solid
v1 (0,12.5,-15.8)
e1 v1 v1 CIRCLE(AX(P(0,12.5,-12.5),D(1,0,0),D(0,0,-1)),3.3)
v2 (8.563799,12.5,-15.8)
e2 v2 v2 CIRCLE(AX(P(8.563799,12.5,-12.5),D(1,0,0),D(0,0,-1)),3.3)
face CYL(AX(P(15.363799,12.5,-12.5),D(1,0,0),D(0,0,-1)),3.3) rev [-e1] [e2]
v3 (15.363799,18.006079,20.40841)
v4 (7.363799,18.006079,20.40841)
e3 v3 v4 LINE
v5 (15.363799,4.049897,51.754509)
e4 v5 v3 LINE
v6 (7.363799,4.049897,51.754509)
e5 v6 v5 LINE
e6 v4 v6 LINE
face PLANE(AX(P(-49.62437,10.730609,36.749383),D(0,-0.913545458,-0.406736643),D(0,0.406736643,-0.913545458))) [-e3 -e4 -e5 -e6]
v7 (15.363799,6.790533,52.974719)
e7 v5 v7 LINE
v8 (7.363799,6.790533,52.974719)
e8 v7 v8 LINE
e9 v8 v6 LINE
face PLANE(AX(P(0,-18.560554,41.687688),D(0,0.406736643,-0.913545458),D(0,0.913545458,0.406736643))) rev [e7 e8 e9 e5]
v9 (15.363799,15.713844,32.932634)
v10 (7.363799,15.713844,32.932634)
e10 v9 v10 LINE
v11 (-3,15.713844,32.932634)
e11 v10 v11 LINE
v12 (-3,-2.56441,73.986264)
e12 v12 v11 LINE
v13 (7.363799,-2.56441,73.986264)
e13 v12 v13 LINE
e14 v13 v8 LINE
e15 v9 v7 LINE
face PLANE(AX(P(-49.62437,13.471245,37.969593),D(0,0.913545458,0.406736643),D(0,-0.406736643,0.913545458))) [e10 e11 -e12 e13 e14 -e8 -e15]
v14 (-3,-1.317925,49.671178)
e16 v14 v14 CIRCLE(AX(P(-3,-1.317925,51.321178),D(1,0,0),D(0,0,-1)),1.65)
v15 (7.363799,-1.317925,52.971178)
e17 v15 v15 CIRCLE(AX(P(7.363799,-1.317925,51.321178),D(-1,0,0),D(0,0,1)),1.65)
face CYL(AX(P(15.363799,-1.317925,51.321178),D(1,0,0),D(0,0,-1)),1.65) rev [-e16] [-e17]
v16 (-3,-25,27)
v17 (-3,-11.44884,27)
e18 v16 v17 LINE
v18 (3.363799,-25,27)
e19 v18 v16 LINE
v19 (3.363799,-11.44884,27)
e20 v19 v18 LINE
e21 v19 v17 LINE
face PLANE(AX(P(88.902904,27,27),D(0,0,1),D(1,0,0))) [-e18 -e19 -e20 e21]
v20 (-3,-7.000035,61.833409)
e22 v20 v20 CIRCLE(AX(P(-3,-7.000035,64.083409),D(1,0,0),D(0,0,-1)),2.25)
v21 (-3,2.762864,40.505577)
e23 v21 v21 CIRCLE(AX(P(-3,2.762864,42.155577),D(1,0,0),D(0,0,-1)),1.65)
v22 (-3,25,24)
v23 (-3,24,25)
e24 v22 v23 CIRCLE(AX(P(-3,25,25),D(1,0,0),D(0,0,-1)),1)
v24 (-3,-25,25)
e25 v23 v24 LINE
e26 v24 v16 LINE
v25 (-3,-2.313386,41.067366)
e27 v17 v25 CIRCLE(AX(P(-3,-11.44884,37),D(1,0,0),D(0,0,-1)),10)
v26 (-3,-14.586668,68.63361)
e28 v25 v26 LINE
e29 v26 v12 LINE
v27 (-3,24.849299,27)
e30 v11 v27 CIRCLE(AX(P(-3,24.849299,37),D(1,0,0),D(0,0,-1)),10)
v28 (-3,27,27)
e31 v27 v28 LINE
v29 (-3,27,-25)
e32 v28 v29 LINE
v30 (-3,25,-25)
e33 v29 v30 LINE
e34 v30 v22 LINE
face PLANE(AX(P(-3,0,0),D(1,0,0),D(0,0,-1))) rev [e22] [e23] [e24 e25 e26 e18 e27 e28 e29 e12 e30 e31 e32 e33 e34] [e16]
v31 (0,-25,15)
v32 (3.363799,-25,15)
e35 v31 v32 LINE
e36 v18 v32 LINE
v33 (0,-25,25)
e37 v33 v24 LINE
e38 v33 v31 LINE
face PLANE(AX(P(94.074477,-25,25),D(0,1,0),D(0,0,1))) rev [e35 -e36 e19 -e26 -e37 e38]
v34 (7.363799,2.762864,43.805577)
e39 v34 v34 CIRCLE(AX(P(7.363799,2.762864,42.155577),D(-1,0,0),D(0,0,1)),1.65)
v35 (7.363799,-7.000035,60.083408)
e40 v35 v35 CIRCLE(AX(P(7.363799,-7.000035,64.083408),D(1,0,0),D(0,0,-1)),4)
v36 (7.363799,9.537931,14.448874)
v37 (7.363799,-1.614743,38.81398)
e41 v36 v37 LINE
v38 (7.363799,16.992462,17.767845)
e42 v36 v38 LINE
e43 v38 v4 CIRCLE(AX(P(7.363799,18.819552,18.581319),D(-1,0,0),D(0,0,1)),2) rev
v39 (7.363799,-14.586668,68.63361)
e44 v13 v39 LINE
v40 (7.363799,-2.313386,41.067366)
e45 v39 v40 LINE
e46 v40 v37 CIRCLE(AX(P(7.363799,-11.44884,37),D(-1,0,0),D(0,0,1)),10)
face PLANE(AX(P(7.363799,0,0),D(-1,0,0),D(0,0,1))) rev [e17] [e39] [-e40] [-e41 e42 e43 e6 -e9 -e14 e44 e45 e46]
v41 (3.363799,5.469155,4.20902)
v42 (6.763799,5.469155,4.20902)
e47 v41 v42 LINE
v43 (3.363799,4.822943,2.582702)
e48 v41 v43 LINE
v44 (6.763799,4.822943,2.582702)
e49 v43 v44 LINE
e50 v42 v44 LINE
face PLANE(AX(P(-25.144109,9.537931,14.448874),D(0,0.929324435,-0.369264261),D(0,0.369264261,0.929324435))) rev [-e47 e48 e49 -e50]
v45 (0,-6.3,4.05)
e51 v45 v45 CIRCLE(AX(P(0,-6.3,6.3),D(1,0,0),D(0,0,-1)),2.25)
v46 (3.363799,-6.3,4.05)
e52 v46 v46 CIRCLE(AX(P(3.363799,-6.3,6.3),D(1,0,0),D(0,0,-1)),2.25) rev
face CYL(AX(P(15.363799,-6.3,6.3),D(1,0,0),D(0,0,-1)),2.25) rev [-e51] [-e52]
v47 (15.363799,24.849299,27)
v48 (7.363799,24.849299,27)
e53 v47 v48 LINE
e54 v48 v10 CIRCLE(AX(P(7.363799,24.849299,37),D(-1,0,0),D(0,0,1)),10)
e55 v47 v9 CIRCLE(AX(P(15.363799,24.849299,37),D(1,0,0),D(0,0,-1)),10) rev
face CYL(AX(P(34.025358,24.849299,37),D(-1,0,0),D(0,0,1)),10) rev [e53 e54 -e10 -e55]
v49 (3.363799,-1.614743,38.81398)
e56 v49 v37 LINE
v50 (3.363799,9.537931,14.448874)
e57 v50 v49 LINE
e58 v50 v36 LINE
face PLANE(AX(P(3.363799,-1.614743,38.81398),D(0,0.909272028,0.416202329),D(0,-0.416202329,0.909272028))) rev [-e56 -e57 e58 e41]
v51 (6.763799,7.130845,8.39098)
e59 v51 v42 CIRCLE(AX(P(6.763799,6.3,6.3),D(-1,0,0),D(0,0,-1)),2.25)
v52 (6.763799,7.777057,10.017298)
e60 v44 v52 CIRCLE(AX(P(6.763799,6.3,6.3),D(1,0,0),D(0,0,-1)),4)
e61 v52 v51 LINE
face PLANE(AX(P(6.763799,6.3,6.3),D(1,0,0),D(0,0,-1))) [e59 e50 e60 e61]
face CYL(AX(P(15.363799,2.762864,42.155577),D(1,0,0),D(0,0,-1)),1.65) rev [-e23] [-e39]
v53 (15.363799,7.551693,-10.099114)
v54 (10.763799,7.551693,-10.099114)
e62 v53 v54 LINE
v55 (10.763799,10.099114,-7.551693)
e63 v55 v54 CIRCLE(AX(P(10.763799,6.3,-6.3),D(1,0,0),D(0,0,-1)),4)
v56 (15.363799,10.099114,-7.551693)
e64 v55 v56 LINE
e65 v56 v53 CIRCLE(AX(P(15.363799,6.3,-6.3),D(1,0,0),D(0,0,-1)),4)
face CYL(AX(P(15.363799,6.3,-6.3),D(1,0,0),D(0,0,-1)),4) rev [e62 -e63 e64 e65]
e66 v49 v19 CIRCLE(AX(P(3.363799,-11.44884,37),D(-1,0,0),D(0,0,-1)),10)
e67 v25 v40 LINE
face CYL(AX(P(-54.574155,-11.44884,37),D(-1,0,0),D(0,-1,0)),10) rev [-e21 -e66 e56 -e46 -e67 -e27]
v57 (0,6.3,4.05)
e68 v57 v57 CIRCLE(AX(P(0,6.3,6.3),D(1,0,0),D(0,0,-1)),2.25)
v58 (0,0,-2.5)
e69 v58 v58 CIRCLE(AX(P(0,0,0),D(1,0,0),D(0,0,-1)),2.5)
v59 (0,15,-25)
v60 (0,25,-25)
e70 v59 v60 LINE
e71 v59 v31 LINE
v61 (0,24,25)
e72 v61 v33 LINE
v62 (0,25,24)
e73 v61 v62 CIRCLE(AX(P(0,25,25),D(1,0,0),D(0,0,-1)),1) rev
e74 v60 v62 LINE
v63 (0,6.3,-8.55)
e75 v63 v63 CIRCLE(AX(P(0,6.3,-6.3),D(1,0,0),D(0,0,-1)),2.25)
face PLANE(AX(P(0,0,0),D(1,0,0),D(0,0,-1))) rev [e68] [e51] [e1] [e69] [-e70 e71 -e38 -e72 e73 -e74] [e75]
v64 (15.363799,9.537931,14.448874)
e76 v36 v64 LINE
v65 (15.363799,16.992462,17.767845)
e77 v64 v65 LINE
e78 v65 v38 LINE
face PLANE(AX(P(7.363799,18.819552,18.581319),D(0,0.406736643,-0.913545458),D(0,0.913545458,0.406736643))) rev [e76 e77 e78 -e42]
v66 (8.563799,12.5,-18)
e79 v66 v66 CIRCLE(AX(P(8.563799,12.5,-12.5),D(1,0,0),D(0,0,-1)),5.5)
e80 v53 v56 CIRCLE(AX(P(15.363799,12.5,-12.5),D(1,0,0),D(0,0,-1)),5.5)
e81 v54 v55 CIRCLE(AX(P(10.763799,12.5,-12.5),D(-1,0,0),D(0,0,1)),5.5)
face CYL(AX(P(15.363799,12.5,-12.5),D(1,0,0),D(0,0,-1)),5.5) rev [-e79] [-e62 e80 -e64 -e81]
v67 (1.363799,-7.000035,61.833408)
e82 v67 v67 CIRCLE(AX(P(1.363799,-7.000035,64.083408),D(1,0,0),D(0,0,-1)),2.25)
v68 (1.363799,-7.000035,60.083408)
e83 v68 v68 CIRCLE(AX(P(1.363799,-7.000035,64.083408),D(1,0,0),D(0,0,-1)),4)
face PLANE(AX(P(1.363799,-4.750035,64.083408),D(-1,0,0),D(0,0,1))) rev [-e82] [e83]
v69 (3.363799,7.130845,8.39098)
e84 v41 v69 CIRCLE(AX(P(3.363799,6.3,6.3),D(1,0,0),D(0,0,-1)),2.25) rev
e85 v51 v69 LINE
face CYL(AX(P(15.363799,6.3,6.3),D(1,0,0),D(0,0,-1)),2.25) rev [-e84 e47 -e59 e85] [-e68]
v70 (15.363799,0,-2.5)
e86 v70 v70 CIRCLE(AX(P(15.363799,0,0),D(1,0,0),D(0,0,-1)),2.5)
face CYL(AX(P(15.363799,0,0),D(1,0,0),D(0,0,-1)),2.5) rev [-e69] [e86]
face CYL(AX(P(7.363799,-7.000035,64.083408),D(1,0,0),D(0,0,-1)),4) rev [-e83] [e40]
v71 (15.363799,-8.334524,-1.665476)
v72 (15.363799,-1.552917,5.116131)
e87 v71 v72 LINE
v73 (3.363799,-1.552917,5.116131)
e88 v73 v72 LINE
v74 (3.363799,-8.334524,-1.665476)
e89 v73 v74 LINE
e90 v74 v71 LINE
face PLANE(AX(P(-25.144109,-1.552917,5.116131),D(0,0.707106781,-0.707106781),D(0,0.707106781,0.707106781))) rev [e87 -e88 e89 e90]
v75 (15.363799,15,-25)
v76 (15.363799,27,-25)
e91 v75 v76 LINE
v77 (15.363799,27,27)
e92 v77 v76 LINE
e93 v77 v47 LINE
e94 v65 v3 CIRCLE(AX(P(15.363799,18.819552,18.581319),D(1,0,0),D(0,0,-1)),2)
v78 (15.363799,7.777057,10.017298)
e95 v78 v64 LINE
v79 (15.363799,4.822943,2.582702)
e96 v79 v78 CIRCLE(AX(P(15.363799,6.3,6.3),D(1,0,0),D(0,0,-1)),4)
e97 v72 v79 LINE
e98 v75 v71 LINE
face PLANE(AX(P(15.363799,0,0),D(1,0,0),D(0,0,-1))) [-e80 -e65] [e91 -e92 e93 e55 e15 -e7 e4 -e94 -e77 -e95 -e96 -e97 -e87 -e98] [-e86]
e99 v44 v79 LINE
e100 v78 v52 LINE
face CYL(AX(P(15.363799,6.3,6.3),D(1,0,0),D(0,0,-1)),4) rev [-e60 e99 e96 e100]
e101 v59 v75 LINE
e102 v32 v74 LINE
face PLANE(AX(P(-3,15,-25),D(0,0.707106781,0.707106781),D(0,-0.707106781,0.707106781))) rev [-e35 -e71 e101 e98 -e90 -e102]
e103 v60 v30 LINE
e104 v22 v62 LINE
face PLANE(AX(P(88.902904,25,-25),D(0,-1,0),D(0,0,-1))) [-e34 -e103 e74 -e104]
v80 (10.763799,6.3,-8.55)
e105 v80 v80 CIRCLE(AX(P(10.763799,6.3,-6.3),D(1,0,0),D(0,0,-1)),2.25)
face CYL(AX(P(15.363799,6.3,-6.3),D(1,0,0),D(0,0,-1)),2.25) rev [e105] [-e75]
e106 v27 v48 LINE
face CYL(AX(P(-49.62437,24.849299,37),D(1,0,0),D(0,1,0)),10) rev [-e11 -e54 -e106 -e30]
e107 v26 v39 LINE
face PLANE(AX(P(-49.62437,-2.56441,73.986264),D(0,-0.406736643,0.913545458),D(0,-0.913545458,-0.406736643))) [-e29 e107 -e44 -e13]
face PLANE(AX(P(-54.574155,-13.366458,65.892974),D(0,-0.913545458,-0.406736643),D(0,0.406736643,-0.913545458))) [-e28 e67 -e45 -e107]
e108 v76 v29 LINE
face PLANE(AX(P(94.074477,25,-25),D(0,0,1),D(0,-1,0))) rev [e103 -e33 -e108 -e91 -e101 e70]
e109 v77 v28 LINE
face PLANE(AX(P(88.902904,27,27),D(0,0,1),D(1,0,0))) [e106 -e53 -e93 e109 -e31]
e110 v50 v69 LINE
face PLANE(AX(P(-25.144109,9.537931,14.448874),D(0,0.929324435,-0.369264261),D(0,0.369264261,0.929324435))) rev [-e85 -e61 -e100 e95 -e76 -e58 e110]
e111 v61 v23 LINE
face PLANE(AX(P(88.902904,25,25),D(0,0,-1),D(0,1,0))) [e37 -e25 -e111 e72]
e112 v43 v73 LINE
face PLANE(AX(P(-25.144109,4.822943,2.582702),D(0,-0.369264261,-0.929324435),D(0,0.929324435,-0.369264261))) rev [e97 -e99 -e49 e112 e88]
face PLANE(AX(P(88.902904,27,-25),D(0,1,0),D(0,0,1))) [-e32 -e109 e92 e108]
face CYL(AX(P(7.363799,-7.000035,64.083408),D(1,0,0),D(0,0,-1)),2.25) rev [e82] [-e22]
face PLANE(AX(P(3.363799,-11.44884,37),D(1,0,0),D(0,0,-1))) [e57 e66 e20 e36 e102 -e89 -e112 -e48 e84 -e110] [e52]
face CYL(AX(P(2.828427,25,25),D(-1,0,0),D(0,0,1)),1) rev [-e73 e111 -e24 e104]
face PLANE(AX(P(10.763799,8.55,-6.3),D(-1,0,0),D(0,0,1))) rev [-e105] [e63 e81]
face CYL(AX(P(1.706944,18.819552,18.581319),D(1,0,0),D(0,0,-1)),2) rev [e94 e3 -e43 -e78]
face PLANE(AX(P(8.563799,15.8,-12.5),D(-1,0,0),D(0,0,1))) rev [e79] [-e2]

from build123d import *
from OCP.BRepAlgoAPI import BRepAlgoAPI_Cut
from OCP.TopTools import TopTools_ListOfShape

# Parameters (mm, degrees)
SKETCH_1_W                  = 50
SKETCH_1_H                  = 50
EXTRUDE_1_DEPTH             = 15.363798586
EXTRUDE_2_DEPTH             = 3
EXTRUDE_2_DEPTH_BACK        = 15.363799
SKETCH_3_R                  = 1
CUT_EXTRUDE_1_DEPTH         = 3
HOLE_WIZARD_M6_1_D          = 5
HOLE_WIZARD_2_D             = 4.5
HOLE_WIZARD_2_CBORE_D       = 8
HOLE_WIZARD_2_CBORE_DEPTH   = 4.6
HOLE_WIZARD_2_2_D           = 6.6
HOLE_WIZARD_2_2_CBORE_D     = 11
HOLE_WIZARD_2_2_CBORE_DEPTH = 6.8
CUT_EXTRUDE_2_DEPTH         = 43.370143954
EXTRUDE_3_DEPTH             = 18.363798591
CUT_EXTRUDE_3_DEPTH         = 8
HOLE_WIZARD_M4_1_D          = 3.3
FILLET_1_R                  = 10
EXTRUDE_4_REACH             = 79.264
CUT_EXTRUDE_6_DEPTH         = 80.437872908
SKETCH_18_W                 = 10.924413006
SKETCH_18_H                 = 26.794832497
CUT_EXTRUDE_8_DEPTH         = 80.600281663
CUT_EXTRUDE_9_DEPTH         = 3.4
CUT_EXTRUDE_11_DEPTH        = 4
CUT_EXTRUDE_12_REACH        = 82.871
CUT_EXTRUDE_13_DEPTH        = 4
EXTRUDE_7_REACH             = 68.474
FILLET_2_R                  = 10
EXTRUDE_8_DEPTH             = 8
SKETCH_27_R                 = 2.000000006
CUT_EXTRUDE_14_DEPTH        = 8
HOLE_WIZARD_4_D             = 4.5
HOLE_WIZARD_4_CBORE_D       = 8
HOLE_WIZARD_4_CBORE_DEPTH   = 6
CUT_EXTRUDE_16_DEPTH        = 8
CUT_EXTRUDE_17_DEPTH        = 20


with BuildPart() as part:
    # 草图1 → 凸台-拉伸1 (new body)
    with BuildSketch(Plane(origin=(0, 0, 0), x_dir=(0, 0, -1), z_dir=(1, 0, 0))):
        Rectangle(SKETCH_1_W, SKETCH_1_H)
    extrude(amount=EXTRUDE_1_DEPTH)

    # 草图2 → 凸台-拉伸2 (add, two sides: drawn at the far end of the back side and taken through both)
    with BuildSketch(Plane.ZY.offset(-EXTRUDE_2_DEPTH_BACK)):
        Polygon((25, 25), (25, -25), (27, -25), (27, 27), (-25, 27), (-25, 25), align=None)
    extrude(amount=EXTRUDE_2_DEPTH + EXTRUDE_2_DEPTH_BACK)

    # 草图3 → 切除-拉伸1 (cut)
    with BuildSketch(Plane.ZY.offset(3)):
        with Locations((25, 25)):
            Circle(SKETCH_3_R)
    extrude(amount=-CUT_EXTRUDE_1_DEPTH, mode=Mode.SUBTRACT)

    # M6 螺纹孔1 (through all)
    with Locations(Plane(origin=(15.363798586, 0, -3e-09), x_dir=(1.78e-10, 0, 1.0), z_dir=(1.0, 0, -1.78e-10))):
        with Locations((0, 0)):
            Hole(HOLE_WIZARD_M6_1_D / 2)

    # Hole Wizard 2 (through all)
    with Locations(Plane(origin=(15.363798585, 6.3, -6.300000003), x_dir=(1.78e-10, 0, 1.0), z_dir=(1.0, 0, -1.78e-10))):
        with Locations((0, 0), (12.6, 0), (12.6, 12.6)):
            CounterBoreHole(HOLE_WIZARD_2_D / 2, HOLE_WIZARD_2_CBORE_D / 2, HOLE_WIZARD_2_CBORE_DEPTH)

    # Hole Wizard 2 2 (through all)
    with Locations(Plane(origin=(15.363798584, 12.5, -12.500000003), x_dir=(1.78e-10, 0, 1.0), z_dir=(1.0, 0, -1.78e-10))):
        with Locations((0, 0)):
            CounterBoreHole(HOLE_WIZARD_2_2_D / 2, HOLE_WIZARD_2_2_CBORE_D / 2, HOLE_WIZARD_2_2_CBORE_DEPTH)

    # 草图10 → 切除-拉伸2 (cut, through all)
    with BuildSketch(Plane(origin=(15.363798586, 0, -3e-09), x_dir=(-1.7849582135895822e-10, 0, -1.0), z_dir=(1.0, -1.476971878251353e-15, -1.7849582135895822e-10))):
        Polygon((24.999999997, -25), (24.999999997, 15), (-15.000000003, -25), align=None)
    extrude(amount=-CUT_EXTRUDE_2_DEPTH, mode=Mode.SUBTRACT)

    # 草图11 → 凸台-拉伸3 (add)
    with BuildSketch(Plane(origin=(15.363798586, 0, -3e-09), x_dir=(-1.7849582135895822e-10, 0, -1.0), z_dir=(1.0, -1.476971878251353e-15, -1.7849582135895822e-10))):
        Polygon((-70.025418171, -4.08483629), (-65.892973878, -13.366458139), (-27.000000003, 3.949809487), (-27.000000003, 15.071314076), align=None)
    extrude(amount=-EXTRUDE_3_DEPTH)


with BuildPart() as cut_extrude_3_tool:
    # 草图16 → 切除-拉伸3 (new body)
    with BuildSketch(Plane(origin=(15.363798586, 0, -3e-09), x_dir=(-1.7849582135895822e-10, 0, -1.0), z_dir=(1.0, -1.476971878251353e-15, -1.7849582135895822e-10))):
        Polygon((-70.025418171, -4.08483629), (-65.892973878, -13.366458139), (-14.448874374, 9.53793065), (-18.581318667, 18.819552499), align=None)
    extrude(amount=-CUT_EXTRUDE_3_DEPTH)


with BuildPart() as part_1:
    add(part.part)

    # 切除-拉伸3: cut by cut_extrude_3_tool, with a tolerance
    cut_extrude_3_stock = TopTools_ListOfShape()
    cut_extrude_3_stock.Append(part_1.part.wrapped)
    cut_extrude_3_tools = TopTools_ListOfShape()
    cut_extrude_3_tools.Append(cut_extrude_3_tool.part.wrapped)
    cut_extrude_3_cut = BRepAlgoAPI_Cut()
    cut_extrude_3_cut.SetArguments(cut_extrude_3_stock)
    cut_extrude_3_cut.SetTools(cut_extrude_3_tools)
    cut_extrude_3_cut.SetFuzzyValue(0.00001)
    cut_extrude_3_cut.Build()
    add(Compound.cast(cut_extrude_3_cut.Shape()).solids(), mode=Mode.REPLACE)

    # M4 螺纹孔1 (through all)
    with Locations(Plane(origin=(15.363798596, -1.317924527, 51.321178454), x_dir=(1.78e-10, 0, 1.0), z_dir=(1.0, 0, -1.78e-10))):
        with Locations((0, 0), (-9.165601576, -4.08078874)):
            Hole(HOLE_WIZARD_M4_1_D / 2)

    # 圆角1
    # the kernel refuses this fillet: 10 mm, written as the material it adds along each edge
    with BuildSketch(Plane(origin=(45.860422684, 3.949809487, 26.999999995), x_dir=(-1.4769991523120053e-15, -1.0, -1.5279946496499765e-10), z_dir=(-1.0, 1.476971878251353e-15, 1.7849582135895822e-10))) as fillet_1_piece_1_section:
        with BuildLine():
            CenterArc((FILLET_1_R * 1.53986496356, FILLET_1_R), FILLET_1_R, 156.000000009, 114)
            Line((FILLET_1_R * 0.626319505852, FILLET_1_R * 1.40673664294), (0, 0))
            Line((0, 0), (FILLET_1_R * 1.53986496371, 0))
        make_face()
    fillet_1_piece_1 = extrude(amount=48.860422684, mode=Mode.PRIVATE)
    fillet_1_piece_1 = split(fillet_1_piece_1, bisect_by=Plane(origin=(45.860422684, 3.949809487, 26.999999995), z_dir=(-7.26021404635483e-11, -0.9135454576426073, -0.40673664307578594)), keep=Keep.TOP, mode=Mode.PRIVATE)
    fillet_1_piece_1 = split(fillet_1_piece_1, bisect_by=Plane(origin=(15.363799, 3.949809487, 26.999999995), z_dir=(-1, 0, 0)), keep=Keep.TOP, mode=Mode.PRIVATE)
    fillet_1_piece_1 = split(fillet_1_piece_1, bisect_by=Plane(origin=(7.363798591, 3.949809487, 27.000000001), z_dir=(1.0, -1.476971878251353e-15, -1.7849582135895822e-10)), keep=Keep.TOP, mode=Mode.PRIVATE)
    add(fillet_1_piece_1)
    with BuildSketch(Plane(origin=(7.363798591, 3.949809487, 27.000000001), x_dir=(-1.4769991523120053e-15, -1.0, -1.5279946496499762e-10), z_dir=(-1.0, 1.476971878251353e-15, 1.7849582135895822e-10))) as fillet_1_piece_2_section:
        with BuildLine():
            CenterArc((FILLET_1_R * 1.53986496356, FILLET_1_R), FILLET_1_R, 156.000000009, 114)
            Line((FILLET_1_R * 0.626319505852, FILLET_1_R * 1.40673664294), (0, 0))
            Line((0, 0), (FILLET_1_R * 1.53986496371, 0))
        make_face()
    fillet_1_piece_2 = extrude(amount=10.363798591, mode=Mode.PRIVATE)
    fillet_1_piece_2 = split(fillet_1_piece_2, bisect_by=Plane(origin=(7.363798591, 3.949809487, 27.000000001), z_dir=(-7.26021404635483e-11, -0.9135454576426073, -0.40673664307578594)), keep=Keep.TOP, mode=Mode.PRIVATE)
    add(fillet_1_piece_2)

    # 凸台-拉伸4: up to this face of the body (flat: up to its plane)
    extrude_4_end = Plane(part_1.part.faces().sort_by_distance((-2.999999996, 0.278812164, 45.630218613))[0])
    # 草图13 → 凸台-拉伸4 (add, up to the picked face)
    with BuildSketch(Plane(origin=(15.363798586, 0, -3e-09), x_dir=(-1.7849582135895822e-10, 0, -1.0), z_dir=(1.0, -1.476971878251353e-15, -1.7849582135895822e-10)), mode=Mode.PRIVATE) as extrude_4_sk1:
        Polygon((-70.025418171, -4.08483629), (-65.892973878, -13.366458139), (-68.633610251, -14.586668069), (-73.986264473, -2.564409846), (-37.969592965, 13.471245459), (-36.749383036, 10.730609086), align=None)
    extrude_4_tool1 = split(extrude(extrude_4_sk1.sketch, amount=-EXTRUDE_4_REACH, mode=Mode.PRIVATE), bisect_by=extrude_4_end, keep=Keep.BOTH, mode=Mode.PRIVATE)
    add(extrude_4_tool1.solids().sort_by(Axis((15.363799, 1.333576, 58.228575), (-1.0, 1.476971878251353e-15, 1.7849582135895822e-10)))[0])

    # 草图17 → 切除-拉伸6 (cut, through all)
    with BuildSketch(Plane(origin=(7.363798586, 0, -1e-09), x_dir=(-1.7849580400330225e-10, 0, -1.0), z_dir=(1.0, -1.4453333388205653e-15, -1.7849580400330225e-10))):
        Polygon((-18.581318667, 18.819552499), (-22.223488553, 27), (-27.000000003, 27), (-27.000000001, 15.071314077), align=None)
        Polygon((-65.892973878, -13.366458139), (-68.633610251, -14.586668069), (-74.397031705, -1.641811538), (-71.656395332, -0.421601609), align=None)
    extrude(amount=CUT_EXTRUDE_6_DEPTH, mode=Mode.SUBTRACT)

    # 草图18 → 切除-拉伸8 (cut, through all)
    with BuildSketch(Plane(origin=(1e-09, 13.328829097, 5.934377055), x_dir=(1.0, -6.632535563560462e-11, -2.952995089226133e-11), z_dir=(7.260214046354829e-11, 0.9135454576426073, 0.406736643075786))):
        with Locations((12.826005091, -22.717693905)):
            Rectangle(SKETCH_18_W, SKETCH_18_H)
    extrude(amount=-CUT_EXTRUDE_8_DEPTH, mode=Mode.SUBTRACT)

    # 草图21 → 切除-拉伸9 (cut)
    with BuildSketch(Plane(origin=(10.763798586, 0, -2e-09), x_dir=(-1.7849582135895822e-10, 0, -1.0), z_dir=(1.0, 0, -1.7849582135895822e-10))):
        with BuildLine():
            Line((-8.790851011, -3.170197891), (-8.035128255, -4.867578994))
            ThreePointArc((-8.035128255, -4.867578994), (-4.24452272, -5.384842553), (-6.396531162, -8.547928321))
            Line((-6.396531162, -8.547928321), (-5.640808406, -10.245309423))
            ThreePointArc((-5.640808406, -10.245309423), (-2.645818169, -4.673053428), (-8.790851011, -3.170197891))
        make_face()
    extrude(amount=-CUT_EXTRUDE_9_DEPTH, mode=Mode.SUBTRACT)

    # 草图22 → 切除-拉伸11 (cut)
    with BuildSketch(Plane(origin=(7.363798586, 0, -1e-09), x_dir=(-1.7849580400330225e-10, 0, -1.0), z_dir=(1.0, -1.4453333388205653e-15, -1.7849580400330225e-10))):
        with BuildLine():
            Line((-38.81398009, -1.614742519), (-14.448874374, 9.537930649))
            Line((-14.448874374, 9.537930649), (-3.97862792, -13.978627918))
            Line((-3.97862792, -13.978627918), (-15.000000001, -25))
            Line((-15.000000001, -25), (-27.000000001, -25))
            Line((-27.000000001, -25), (-27.000000001, -11.448840151))
            ThreePointArc((-27.000000001, -11.448840151), (-30.6023364, -3.763145619), (-38.81398009, -1.614742519))
        make_face()
    extrude(amount=-CUT_EXTRUDE_11_DEPTH, mode=Mode.SUBTRACT)

    # 切除-拉伸12: up to this face of the body (flat: up to its plane)
    cut_extrude_12_end = Plane(part_1.part.faces().sort_by_distance((3.36379859, -8.635202304, 18.67291257))[0])
    # 草图23 → 切除-拉伸12 (cut, up to the picked face)
    with BuildSketch(Plane(origin=(15.363798586, 0, -3e-09), x_dir=(-1.7849582135895822e-10, 0, -1.0), z_dir=(1.0, -1.476971878251353e-15, -1.7849582135895822e-10)), mode=Mode.PRIVATE) as cut_extrude_12_sk1:
        Polygon((-14.448874367, 9.53793065), (-6.3, 6.3), (-2.58270226, 4.822942956), (-5.116130862, -1.552916699), (1.665476218, -8.334523779), (-3.978627921, -13.978627918), align=None)
    cut_extrude_12_tool1 = split(extrude(cut_extrude_12_sk1.sketch, amount=-CUT_EXTRUDE_12_REACH, mode=Mode.PRIVATE), bisect_by=cut_extrude_12_end, keep=Keep.BOTH, mode=Mode.PRIVATE)
    add(cut_extrude_12_tool1.solids().sort_by(Axis((15.363799, -1.65036, 6.158342), (-1.0, 1.476971878251353e-15, 1.7849582135895822e-10)))[0], mode=Mode.SUBTRACT)

    # 草图24 → 切除-拉伸13 (cut)
    with BuildSketch(Plane(origin=(10.763798586, 0, -2e-09), x_dir=(-1.7849582135895822e-10, 0, -1.0), z_dir=(1.0, 0, -1.7849582135895822e-10))):
        with BuildLine():
            Line((-10.01729774, 7.777057044), (-8.390979979, 7.130844587))
            ThreePointArc((-8.390979979, 7.130844587), (-5.469155413, 8.390979979), (-4.209020021, 5.469155413))
            Line((-4.209020021, 5.469155413), (-2.58270226, 4.822942956))
            ThreePointArc((-2.58270226, 4.822942956), (-4.822942956, 10.01729774), (-10.01729774, 7.777057044))
        make_face()
    extrude(amount=-CUT_EXTRUDE_13_DEPTH, mode=Mode.SUBTRACT)

    # 凸台-拉伸7: up to this face of the body (flat: up to its plane)
    extrude_7_end = Plane(part_1.part.faces().sort_by_distance((2.181899296, 21.035657038, 27))[0])
    # 草图25 → 凸台-拉伸7 (add, up to the picked face)
    with BuildSketch(Plane(origin=(5e-09, -11.87984186, 26.682561687), x_dir=(-1.0, -6.632387866372851e-11, 1.4896587046669596e-10), z_dir=(-1.630634460720778e-10, 0.4067366430757988, -0.9135454576426015)), mode=Mode.PRIVATE) as extrude_7_sk1:
        Polygon((3.000000005, 24.75021988), (3.000000005, 27.75021988), (-15.363798588, 27.750219878), (-15.363798588, 24.750219878), (-7.363798588, 24.750219879), align=None)
    extrude_7_tool1 = split(extrude(extrude_7_sk1.sketch, amount=EXTRUDE_7_REACH, mode=Mode.PRIVATE), bisect_by=extrude_7_end, keep=Keep.BOTH, mode=Mode.PRIVATE)
    add(extrude_7_tool1.solids().sort_by(Axis((6.181899, 12.100927, 37.359488), (-1.630634460720778e-10, 0.4067366430757988, -0.9135454576426015)))[0])

    # 圆角2
    fillet_2_edges = [part_1.edges().sort_by_distance(p)[0] for p in [
        (2.181899295, 18.355222913, 27),
    ]]
    fillet(fillet_2_edges, radius=FILLET_2_R)

    # 草图26 → 凸台-拉伸8 (add)
    with BuildSketch(Plane(origin=(7.363798586, 0, -1e-09), x_dir=(-1.7849580400330225e-10, 0, -1.0), z_dir=(1.0, -1.4453333388205653e-15, -1.7849580400330225e-10))):
        with BuildLine():
            Line((-27.000000002, 18.355222913), (-27.000000001, 15.071314077))
            Line((-27.000000001, 15.071314077), (-18.58131867, 18.819552492))
            Line((-18.58131867, 18.819552492), (-22.223488553, 27))
            Line((-22.223488553, 27), (-27.000000003, 27))
            Line((-27.000000003, 27), (-27.000000002, 24.849298844))
            ThreePointArc((-27.000000002, 24.849298844), (-28.613294322, 19.402908494), (-32.932633571, 15.713844268))
            Line((-32.932633571, 15.713844268), (-27.000000002, 18.355222913))
        make_face()
    extrude(amount=EXTRUDE_8_DEPTH)

    # 草图27 → 切除-拉伸14 (cut)
    with BuildSketch(Plane(origin=(15.363798586, 0, -3e-09), x_dir=(-1.7849582135895822e-10, 0, -1.0), z_dir=(1.0, -1.476971878251353e-15, -1.7849582135895822e-10))):
        with Locations((-18.581318665, 18.819552494)):
            Circle(SKETCH_27_R)
    extrude(amount=-CUT_EXTRUDE_14_DEPTH, mode=Mode.SUBTRACT)

    # 打孔尺寸(%根据)内六角圆柱头螺钉的类型4 (through all)
    with Locations(Plane(origin=(7.363798598, -7.00003543, 64.083408499), x_dir=(1.78e-10, 0, 1.0), z_dir=(1.0, 0, -1.78e-10))):
        with Locations((0, 0)):
            CounterBoreHole(HOLE_WIZARD_4_D / 2, HOLE_WIZARD_4_CBORE_D / 2, HOLE_WIZARD_4_CBORE_DEPTH)

    # 草图31 → 切除-拉伸16 (cut)
    with BuildSketch(Plane(origin=(15.363798586, 0, -3e-09), x_dir=(-1.7849582135895822e-10, 0, -1.0), z_dir=(1.0, -1.476971878251353e-15, -1.7849582135895822e-10))):
        with BuildLine():
            Line((-38.813980091, -1.614742519), (-38.927171891, -1.360509573))
            Line((-38.927171891, -1.360509573), (-41.067366433, -2.313385575))
            ThreePointArc((-41.067366433, -2.313385575), (-39.961348471, -1.897378732), (-38.813980091, -1.614742519))
        make_face()
    extrude(amount=-CUT_EXTRUDE_16_DEPTH, mode=Mode.SUBTRACT)

    # 草图32 → 切除-拉伸17 (cut)
    with BuildSketch(Plane(origin=(1.1e-08, -26.695287236, 59.958596822), x_dir=(1.0, 6.632387744895951e-11, -1.4896586773827423e-10), z_dir=(1.6306344308544944e-10, -0.40673664307581253, 0.9135454576425954))):
        Polygon((15.363798588, 24.750219878), (15.363798606, 27.750219878), (7.363798588, 27.750219879), (7.363798588, 24.750219879), align=None)
    extrude(amount=-CUT_EXTRUDE_17_DEPTH, mode=Mode.SUBTRACT)


solid = part_1.part
